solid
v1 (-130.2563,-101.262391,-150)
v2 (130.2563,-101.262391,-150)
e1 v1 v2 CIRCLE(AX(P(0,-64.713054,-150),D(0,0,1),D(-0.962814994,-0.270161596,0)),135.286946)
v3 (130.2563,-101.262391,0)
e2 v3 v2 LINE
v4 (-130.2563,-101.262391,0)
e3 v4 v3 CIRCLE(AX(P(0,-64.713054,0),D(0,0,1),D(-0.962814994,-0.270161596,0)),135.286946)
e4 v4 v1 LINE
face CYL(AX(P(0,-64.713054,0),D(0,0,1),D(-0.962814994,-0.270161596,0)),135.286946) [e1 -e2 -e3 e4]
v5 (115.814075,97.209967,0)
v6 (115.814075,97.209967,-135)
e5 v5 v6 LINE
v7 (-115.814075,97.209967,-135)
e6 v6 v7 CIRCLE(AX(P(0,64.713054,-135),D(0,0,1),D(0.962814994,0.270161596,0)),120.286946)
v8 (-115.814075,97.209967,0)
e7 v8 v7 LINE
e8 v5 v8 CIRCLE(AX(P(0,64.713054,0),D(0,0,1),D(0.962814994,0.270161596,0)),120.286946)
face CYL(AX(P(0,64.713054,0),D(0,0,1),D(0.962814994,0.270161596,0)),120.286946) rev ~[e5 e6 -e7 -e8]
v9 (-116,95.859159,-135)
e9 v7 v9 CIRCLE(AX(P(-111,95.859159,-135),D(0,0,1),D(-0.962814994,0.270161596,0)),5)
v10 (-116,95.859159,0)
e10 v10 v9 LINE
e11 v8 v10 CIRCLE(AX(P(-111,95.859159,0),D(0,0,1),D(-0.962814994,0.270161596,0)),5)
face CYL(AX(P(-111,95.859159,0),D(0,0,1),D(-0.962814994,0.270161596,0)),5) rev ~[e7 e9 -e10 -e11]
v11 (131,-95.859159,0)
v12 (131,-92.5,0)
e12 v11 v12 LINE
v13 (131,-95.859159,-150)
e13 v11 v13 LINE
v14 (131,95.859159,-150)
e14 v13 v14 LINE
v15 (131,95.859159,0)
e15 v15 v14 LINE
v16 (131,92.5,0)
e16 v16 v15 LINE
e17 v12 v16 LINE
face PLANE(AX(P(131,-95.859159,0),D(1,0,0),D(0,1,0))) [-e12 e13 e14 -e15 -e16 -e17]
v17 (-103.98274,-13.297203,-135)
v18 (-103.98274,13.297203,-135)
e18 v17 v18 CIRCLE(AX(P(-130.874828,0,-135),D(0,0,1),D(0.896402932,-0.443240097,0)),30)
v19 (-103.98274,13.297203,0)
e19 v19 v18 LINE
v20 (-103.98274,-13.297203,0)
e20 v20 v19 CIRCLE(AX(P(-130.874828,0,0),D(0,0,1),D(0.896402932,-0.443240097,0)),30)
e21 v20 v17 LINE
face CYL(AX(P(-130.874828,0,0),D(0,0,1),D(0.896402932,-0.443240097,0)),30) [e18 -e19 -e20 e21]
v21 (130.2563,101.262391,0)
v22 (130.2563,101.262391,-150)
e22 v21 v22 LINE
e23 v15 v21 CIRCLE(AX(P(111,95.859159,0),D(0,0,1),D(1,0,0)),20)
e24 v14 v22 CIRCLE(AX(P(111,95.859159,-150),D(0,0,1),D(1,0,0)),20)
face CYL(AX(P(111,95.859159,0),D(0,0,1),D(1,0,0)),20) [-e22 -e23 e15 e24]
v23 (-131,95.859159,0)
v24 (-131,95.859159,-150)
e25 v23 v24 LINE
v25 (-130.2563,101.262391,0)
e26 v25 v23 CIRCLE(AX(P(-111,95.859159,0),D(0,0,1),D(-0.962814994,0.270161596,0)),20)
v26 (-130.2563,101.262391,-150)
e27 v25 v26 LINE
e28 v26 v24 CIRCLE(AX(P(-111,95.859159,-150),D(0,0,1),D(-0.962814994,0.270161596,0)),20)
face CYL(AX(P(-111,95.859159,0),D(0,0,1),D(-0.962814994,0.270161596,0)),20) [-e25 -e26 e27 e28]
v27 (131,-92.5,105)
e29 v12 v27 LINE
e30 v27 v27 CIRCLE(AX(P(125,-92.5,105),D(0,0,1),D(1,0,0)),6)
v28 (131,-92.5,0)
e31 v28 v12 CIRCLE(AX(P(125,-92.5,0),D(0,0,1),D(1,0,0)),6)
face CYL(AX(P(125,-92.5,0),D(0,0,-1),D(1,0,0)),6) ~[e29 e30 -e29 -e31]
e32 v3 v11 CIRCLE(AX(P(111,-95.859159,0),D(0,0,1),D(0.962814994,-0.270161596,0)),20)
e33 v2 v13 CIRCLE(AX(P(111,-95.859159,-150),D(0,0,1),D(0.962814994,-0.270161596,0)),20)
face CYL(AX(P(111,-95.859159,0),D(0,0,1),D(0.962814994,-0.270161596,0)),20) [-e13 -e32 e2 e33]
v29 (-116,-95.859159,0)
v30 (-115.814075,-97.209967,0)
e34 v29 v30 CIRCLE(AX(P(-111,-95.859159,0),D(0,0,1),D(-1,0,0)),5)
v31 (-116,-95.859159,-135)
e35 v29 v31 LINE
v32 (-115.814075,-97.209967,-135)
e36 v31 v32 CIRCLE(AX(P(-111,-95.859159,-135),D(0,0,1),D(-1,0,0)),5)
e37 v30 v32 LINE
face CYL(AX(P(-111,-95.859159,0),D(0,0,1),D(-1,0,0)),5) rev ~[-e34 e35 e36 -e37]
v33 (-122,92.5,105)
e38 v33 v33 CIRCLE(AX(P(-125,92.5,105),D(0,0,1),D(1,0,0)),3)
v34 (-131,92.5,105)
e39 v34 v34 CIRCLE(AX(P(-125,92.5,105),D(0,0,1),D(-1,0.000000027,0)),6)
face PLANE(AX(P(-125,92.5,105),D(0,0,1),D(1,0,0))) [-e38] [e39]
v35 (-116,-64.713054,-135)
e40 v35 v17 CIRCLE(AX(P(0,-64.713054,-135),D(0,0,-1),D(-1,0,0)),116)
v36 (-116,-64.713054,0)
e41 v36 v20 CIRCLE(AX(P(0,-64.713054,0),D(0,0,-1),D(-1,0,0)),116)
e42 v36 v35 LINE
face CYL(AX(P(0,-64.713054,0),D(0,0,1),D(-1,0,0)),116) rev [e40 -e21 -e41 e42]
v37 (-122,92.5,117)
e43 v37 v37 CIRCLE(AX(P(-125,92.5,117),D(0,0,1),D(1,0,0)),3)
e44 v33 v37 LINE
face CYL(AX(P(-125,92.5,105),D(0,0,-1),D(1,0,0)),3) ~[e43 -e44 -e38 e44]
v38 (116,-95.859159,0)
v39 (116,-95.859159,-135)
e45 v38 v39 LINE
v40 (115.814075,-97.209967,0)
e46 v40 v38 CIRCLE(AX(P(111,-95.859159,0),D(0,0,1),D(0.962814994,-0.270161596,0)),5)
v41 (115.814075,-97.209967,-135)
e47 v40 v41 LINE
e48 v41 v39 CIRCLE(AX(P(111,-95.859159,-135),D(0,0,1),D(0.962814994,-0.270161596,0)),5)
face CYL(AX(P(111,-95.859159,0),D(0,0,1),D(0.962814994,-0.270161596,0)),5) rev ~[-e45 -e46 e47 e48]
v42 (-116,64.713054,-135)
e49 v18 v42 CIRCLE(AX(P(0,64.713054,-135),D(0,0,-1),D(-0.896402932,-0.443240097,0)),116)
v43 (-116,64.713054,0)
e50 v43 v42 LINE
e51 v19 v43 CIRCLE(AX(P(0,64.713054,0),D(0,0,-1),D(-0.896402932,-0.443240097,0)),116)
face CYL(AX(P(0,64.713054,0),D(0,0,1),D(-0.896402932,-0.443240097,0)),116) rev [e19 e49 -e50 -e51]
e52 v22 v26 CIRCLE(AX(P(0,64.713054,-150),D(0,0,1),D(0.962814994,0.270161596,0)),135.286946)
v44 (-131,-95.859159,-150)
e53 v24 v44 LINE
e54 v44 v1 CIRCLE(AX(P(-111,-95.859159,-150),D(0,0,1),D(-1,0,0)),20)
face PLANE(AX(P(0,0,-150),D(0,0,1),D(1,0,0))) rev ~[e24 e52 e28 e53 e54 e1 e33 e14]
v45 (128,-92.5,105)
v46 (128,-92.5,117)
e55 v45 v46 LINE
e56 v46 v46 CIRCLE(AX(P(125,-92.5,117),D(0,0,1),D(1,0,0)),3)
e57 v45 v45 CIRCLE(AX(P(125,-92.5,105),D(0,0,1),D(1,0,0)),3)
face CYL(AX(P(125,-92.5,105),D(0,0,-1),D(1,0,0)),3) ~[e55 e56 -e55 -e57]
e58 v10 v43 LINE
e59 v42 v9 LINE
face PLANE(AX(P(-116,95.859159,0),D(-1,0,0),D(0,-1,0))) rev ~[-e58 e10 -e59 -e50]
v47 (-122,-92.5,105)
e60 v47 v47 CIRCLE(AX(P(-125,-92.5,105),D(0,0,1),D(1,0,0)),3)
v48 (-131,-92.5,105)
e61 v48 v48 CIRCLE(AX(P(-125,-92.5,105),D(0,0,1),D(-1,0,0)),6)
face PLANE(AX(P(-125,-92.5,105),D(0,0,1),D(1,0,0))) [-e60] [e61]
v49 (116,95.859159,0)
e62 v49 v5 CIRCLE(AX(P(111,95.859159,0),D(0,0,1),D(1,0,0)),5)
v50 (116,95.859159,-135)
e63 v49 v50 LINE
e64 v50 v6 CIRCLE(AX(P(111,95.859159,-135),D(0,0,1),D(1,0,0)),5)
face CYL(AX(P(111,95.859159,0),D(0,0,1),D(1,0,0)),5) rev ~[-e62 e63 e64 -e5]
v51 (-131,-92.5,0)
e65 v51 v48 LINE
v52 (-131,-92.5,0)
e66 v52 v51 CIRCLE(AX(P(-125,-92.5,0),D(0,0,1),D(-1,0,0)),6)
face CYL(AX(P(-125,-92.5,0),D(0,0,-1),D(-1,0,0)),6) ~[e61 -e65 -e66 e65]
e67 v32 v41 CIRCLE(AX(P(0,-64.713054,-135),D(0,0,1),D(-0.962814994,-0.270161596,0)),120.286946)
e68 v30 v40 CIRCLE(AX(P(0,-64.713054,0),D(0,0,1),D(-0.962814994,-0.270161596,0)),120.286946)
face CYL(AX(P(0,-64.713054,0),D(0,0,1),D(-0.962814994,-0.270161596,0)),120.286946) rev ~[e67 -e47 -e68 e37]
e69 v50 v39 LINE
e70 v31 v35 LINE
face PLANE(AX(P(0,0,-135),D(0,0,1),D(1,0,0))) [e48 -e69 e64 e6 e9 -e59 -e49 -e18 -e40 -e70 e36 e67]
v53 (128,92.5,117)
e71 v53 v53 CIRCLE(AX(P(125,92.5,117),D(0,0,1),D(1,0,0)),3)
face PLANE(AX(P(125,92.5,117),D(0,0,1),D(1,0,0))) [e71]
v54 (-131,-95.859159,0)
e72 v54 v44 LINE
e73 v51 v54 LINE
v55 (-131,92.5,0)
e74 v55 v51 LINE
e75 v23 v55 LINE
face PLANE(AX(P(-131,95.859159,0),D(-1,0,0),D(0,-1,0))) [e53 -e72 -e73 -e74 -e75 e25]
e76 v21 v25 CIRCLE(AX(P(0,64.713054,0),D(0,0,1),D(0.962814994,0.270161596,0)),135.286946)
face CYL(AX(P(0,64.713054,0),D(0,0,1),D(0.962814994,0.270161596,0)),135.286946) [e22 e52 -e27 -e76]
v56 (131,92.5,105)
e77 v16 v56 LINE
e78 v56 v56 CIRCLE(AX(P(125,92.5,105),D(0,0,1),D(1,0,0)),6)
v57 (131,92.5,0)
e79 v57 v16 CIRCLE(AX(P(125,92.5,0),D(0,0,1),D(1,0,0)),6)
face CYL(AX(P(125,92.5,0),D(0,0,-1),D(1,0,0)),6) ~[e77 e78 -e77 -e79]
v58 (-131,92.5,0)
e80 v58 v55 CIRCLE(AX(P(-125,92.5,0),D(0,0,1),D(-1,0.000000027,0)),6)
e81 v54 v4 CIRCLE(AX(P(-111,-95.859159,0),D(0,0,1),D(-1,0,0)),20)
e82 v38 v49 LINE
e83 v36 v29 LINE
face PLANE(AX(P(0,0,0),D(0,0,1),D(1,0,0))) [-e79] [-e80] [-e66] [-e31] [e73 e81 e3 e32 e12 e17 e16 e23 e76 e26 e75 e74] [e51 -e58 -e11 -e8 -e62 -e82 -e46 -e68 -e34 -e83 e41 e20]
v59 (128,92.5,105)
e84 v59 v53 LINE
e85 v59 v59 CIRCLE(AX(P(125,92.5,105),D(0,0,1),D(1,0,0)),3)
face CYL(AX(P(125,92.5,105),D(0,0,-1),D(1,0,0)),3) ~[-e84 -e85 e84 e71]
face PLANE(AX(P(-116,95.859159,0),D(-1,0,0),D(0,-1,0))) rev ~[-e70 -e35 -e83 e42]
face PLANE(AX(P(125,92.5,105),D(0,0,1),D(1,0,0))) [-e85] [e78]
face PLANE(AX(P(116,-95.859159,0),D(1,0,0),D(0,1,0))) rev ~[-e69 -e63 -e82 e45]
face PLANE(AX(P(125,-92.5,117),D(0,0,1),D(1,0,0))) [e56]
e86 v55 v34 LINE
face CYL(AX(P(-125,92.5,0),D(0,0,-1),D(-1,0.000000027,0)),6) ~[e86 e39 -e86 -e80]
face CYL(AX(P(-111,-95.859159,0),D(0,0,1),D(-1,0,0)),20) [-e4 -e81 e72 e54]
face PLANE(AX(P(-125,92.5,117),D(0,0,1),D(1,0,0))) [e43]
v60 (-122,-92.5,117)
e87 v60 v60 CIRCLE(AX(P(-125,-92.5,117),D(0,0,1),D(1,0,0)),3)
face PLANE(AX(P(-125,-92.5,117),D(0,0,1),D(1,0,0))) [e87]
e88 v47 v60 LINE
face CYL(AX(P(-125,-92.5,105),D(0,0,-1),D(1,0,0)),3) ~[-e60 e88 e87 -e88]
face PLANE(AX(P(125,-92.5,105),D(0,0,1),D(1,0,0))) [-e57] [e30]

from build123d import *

# Parameters (mm, degrees)
F0_R     = 6
F1_DEPTH = 150
F2_T     = -15
F4_DEPTH = 135
F5_DEPTH = 105
F6_R     = 3
F7_DEPTH = 12


# Not quite as in the source:
# - a feature names something its author has since deleted; it is built from what else it names


with BuildPart() as f1:
    # F0 (on Top) → F1 (new body)
    with BuildSketch(Plane.XY):
        with BuildLine():
            Line((-131, -92.5), (-131, -95.859159479))
            ThreePointArc((-131, -95.859159479), (-130.8132026368, -98.5862460693), (-130.2562998729, -101.2623914012))
            ThreePointArc((-130.2562998729, -101.2623914012), (0, -200), (130.2562998729, -101.2623914012))
            ThreePointArc((130.2562998729, -101.2623914012), (130.8132026368, -98.5862460693), (131, -95.859159479))
            Line((131, -95.859159479), (131, -92.5))
            Line((131, -92.5), (131, 92.5))
            Line((131, 92.5), (131, 95.859159479))
            ThreePointArc((131, 95.859159479), (130.8132026368, 98.5862460693), (130.2562998729, 101.2623914012))
            ThreePointArc((130.2562998729, 101.2623914012), (0, 200), (-130.2562998729, 101.2623914012))
            ThreePointArc((-130.2562998729, 101.2623914012), (-130.8132026368, 98.5862460693), (-131, 95.859159479))
            Line((-131, 95.859159479), (-131, 92.5000001623))
            Line((-131, 92.5000001623), (-131, -92.5))
        make_face()
        with BuildLine():
            ThreePointArc((-119, -92.5), (-125, -98.5), (-131, -92.5))
            ThreePointArc((-131, -92.5), (-125, -86.5), (-119, -92.5))
        make_face(mode=Mode.SUBTRACT)
        with Locations((125, -92.5)):
            Circle(F0_R, mode=Mode.SUBTRACT)
        with BuildLine():
            ThreePointArc((-119, 92.5), (-125.0000000812, 86.5), (-131, 92.5000001623))
            ThreePointArc((-131, 92.5000001623), (-124.9999999188, 98.5), (-119, 92.5))
        make_face(mode=Mode.SUBTRACT)
        with Locations((125, 92.5)):
            Circle(F0_R, mode=Mode.SUBTRACT)
        with BuildLine():
            ThreePointArc((-119, -92.5), (-125, -86.5), (-131, -92.5))
            ThreePointArc((-131, -92.5), (-125, -98.5), (-119, -92.5))
        make_face()
        with BuildLine():
            ThreePointArc((-119, 92.5), (-124.9999999188, 98.5), (-131, 92.5000001623))
            ThreePointArc((-131, 92.5000001623), (-125.0000000812, 86.5), (-119, 92.5))
        make_face()
        with Locations((125, -92.5)):
            Circle(F0_R)
        with Locations((125, 92.5)):
            Circle(F0_R)
    extrude(amount=-F1_DEPTH)

    # F2
    f2_openings = [f1.faces().sort_by_distance(p)[0] for p in [
        (0, 0, 0),
    ]]
    offset(amount=F2_T, openings=f2_openings)

    # F3 (on face) → F4 (join, through all)
    with BuildSketch(Plane.XY):
        with BuildLine():
            ThreePointArc((-103.9827400965, 13.2972029152), (-112.95573879, 38.3122762743), (-116, 64.7130541872))
            Line((-116, 64.7130541872), (-116, -64.7130541872))
            ThreePointArc((-116, -64.7130541872), (-112.95573879, -38.3122762743), (-103.9827400965, -13.2972029152))
            ThreePointArc((-103.9827400965, -13.2972029152), (-100.8748280525, 0), (-103.9827400965, 13.2972029152))
        make_face()
    extrude(amount=-F4_DEPTH)

    # F0 (on Top) → F5 (join)
    with BuildSketch(Plane.XY):
        with Locations((125, -92.5)):
            Circle(F0_R)
        with Locations((125, 92.5)):
            Circle(F0_R)
        with BuildLine():
            ThreePointArc((-119, 92.5), (-124.9999999188, 98.5), (-131, 92.5000001623))
            ThreePointArc((-131, 92.5000001623), (-125.0000000812, 86.5), (-119, 92.5))
        make_face()
        with BuildLine():
            ThreePointArc((-119, -92.5), (-125, -86.5), (-131, -92.5))
            ThreePointArc((-131, -92.5), (-125, -98.5), (-119, -92.5))
        make_face()
    extrude(amount=F5_DEPTH)

    # F6 (on face) → F7 (join)
    with BuildSketch(Plane.XY.offset(105)):
        with Locations((125, -92.5)):
            Circle(F6_R)
        with Locations((-125, -92.5)):
            Circle(F6_R)
        with Locations((125, 92.5)):
            Circle(F6_R)
        with Locations((-125, 92.5)):
            Circle(F6_R)
    extrude(amount=F7_DEPTH)


solid = f1.part
